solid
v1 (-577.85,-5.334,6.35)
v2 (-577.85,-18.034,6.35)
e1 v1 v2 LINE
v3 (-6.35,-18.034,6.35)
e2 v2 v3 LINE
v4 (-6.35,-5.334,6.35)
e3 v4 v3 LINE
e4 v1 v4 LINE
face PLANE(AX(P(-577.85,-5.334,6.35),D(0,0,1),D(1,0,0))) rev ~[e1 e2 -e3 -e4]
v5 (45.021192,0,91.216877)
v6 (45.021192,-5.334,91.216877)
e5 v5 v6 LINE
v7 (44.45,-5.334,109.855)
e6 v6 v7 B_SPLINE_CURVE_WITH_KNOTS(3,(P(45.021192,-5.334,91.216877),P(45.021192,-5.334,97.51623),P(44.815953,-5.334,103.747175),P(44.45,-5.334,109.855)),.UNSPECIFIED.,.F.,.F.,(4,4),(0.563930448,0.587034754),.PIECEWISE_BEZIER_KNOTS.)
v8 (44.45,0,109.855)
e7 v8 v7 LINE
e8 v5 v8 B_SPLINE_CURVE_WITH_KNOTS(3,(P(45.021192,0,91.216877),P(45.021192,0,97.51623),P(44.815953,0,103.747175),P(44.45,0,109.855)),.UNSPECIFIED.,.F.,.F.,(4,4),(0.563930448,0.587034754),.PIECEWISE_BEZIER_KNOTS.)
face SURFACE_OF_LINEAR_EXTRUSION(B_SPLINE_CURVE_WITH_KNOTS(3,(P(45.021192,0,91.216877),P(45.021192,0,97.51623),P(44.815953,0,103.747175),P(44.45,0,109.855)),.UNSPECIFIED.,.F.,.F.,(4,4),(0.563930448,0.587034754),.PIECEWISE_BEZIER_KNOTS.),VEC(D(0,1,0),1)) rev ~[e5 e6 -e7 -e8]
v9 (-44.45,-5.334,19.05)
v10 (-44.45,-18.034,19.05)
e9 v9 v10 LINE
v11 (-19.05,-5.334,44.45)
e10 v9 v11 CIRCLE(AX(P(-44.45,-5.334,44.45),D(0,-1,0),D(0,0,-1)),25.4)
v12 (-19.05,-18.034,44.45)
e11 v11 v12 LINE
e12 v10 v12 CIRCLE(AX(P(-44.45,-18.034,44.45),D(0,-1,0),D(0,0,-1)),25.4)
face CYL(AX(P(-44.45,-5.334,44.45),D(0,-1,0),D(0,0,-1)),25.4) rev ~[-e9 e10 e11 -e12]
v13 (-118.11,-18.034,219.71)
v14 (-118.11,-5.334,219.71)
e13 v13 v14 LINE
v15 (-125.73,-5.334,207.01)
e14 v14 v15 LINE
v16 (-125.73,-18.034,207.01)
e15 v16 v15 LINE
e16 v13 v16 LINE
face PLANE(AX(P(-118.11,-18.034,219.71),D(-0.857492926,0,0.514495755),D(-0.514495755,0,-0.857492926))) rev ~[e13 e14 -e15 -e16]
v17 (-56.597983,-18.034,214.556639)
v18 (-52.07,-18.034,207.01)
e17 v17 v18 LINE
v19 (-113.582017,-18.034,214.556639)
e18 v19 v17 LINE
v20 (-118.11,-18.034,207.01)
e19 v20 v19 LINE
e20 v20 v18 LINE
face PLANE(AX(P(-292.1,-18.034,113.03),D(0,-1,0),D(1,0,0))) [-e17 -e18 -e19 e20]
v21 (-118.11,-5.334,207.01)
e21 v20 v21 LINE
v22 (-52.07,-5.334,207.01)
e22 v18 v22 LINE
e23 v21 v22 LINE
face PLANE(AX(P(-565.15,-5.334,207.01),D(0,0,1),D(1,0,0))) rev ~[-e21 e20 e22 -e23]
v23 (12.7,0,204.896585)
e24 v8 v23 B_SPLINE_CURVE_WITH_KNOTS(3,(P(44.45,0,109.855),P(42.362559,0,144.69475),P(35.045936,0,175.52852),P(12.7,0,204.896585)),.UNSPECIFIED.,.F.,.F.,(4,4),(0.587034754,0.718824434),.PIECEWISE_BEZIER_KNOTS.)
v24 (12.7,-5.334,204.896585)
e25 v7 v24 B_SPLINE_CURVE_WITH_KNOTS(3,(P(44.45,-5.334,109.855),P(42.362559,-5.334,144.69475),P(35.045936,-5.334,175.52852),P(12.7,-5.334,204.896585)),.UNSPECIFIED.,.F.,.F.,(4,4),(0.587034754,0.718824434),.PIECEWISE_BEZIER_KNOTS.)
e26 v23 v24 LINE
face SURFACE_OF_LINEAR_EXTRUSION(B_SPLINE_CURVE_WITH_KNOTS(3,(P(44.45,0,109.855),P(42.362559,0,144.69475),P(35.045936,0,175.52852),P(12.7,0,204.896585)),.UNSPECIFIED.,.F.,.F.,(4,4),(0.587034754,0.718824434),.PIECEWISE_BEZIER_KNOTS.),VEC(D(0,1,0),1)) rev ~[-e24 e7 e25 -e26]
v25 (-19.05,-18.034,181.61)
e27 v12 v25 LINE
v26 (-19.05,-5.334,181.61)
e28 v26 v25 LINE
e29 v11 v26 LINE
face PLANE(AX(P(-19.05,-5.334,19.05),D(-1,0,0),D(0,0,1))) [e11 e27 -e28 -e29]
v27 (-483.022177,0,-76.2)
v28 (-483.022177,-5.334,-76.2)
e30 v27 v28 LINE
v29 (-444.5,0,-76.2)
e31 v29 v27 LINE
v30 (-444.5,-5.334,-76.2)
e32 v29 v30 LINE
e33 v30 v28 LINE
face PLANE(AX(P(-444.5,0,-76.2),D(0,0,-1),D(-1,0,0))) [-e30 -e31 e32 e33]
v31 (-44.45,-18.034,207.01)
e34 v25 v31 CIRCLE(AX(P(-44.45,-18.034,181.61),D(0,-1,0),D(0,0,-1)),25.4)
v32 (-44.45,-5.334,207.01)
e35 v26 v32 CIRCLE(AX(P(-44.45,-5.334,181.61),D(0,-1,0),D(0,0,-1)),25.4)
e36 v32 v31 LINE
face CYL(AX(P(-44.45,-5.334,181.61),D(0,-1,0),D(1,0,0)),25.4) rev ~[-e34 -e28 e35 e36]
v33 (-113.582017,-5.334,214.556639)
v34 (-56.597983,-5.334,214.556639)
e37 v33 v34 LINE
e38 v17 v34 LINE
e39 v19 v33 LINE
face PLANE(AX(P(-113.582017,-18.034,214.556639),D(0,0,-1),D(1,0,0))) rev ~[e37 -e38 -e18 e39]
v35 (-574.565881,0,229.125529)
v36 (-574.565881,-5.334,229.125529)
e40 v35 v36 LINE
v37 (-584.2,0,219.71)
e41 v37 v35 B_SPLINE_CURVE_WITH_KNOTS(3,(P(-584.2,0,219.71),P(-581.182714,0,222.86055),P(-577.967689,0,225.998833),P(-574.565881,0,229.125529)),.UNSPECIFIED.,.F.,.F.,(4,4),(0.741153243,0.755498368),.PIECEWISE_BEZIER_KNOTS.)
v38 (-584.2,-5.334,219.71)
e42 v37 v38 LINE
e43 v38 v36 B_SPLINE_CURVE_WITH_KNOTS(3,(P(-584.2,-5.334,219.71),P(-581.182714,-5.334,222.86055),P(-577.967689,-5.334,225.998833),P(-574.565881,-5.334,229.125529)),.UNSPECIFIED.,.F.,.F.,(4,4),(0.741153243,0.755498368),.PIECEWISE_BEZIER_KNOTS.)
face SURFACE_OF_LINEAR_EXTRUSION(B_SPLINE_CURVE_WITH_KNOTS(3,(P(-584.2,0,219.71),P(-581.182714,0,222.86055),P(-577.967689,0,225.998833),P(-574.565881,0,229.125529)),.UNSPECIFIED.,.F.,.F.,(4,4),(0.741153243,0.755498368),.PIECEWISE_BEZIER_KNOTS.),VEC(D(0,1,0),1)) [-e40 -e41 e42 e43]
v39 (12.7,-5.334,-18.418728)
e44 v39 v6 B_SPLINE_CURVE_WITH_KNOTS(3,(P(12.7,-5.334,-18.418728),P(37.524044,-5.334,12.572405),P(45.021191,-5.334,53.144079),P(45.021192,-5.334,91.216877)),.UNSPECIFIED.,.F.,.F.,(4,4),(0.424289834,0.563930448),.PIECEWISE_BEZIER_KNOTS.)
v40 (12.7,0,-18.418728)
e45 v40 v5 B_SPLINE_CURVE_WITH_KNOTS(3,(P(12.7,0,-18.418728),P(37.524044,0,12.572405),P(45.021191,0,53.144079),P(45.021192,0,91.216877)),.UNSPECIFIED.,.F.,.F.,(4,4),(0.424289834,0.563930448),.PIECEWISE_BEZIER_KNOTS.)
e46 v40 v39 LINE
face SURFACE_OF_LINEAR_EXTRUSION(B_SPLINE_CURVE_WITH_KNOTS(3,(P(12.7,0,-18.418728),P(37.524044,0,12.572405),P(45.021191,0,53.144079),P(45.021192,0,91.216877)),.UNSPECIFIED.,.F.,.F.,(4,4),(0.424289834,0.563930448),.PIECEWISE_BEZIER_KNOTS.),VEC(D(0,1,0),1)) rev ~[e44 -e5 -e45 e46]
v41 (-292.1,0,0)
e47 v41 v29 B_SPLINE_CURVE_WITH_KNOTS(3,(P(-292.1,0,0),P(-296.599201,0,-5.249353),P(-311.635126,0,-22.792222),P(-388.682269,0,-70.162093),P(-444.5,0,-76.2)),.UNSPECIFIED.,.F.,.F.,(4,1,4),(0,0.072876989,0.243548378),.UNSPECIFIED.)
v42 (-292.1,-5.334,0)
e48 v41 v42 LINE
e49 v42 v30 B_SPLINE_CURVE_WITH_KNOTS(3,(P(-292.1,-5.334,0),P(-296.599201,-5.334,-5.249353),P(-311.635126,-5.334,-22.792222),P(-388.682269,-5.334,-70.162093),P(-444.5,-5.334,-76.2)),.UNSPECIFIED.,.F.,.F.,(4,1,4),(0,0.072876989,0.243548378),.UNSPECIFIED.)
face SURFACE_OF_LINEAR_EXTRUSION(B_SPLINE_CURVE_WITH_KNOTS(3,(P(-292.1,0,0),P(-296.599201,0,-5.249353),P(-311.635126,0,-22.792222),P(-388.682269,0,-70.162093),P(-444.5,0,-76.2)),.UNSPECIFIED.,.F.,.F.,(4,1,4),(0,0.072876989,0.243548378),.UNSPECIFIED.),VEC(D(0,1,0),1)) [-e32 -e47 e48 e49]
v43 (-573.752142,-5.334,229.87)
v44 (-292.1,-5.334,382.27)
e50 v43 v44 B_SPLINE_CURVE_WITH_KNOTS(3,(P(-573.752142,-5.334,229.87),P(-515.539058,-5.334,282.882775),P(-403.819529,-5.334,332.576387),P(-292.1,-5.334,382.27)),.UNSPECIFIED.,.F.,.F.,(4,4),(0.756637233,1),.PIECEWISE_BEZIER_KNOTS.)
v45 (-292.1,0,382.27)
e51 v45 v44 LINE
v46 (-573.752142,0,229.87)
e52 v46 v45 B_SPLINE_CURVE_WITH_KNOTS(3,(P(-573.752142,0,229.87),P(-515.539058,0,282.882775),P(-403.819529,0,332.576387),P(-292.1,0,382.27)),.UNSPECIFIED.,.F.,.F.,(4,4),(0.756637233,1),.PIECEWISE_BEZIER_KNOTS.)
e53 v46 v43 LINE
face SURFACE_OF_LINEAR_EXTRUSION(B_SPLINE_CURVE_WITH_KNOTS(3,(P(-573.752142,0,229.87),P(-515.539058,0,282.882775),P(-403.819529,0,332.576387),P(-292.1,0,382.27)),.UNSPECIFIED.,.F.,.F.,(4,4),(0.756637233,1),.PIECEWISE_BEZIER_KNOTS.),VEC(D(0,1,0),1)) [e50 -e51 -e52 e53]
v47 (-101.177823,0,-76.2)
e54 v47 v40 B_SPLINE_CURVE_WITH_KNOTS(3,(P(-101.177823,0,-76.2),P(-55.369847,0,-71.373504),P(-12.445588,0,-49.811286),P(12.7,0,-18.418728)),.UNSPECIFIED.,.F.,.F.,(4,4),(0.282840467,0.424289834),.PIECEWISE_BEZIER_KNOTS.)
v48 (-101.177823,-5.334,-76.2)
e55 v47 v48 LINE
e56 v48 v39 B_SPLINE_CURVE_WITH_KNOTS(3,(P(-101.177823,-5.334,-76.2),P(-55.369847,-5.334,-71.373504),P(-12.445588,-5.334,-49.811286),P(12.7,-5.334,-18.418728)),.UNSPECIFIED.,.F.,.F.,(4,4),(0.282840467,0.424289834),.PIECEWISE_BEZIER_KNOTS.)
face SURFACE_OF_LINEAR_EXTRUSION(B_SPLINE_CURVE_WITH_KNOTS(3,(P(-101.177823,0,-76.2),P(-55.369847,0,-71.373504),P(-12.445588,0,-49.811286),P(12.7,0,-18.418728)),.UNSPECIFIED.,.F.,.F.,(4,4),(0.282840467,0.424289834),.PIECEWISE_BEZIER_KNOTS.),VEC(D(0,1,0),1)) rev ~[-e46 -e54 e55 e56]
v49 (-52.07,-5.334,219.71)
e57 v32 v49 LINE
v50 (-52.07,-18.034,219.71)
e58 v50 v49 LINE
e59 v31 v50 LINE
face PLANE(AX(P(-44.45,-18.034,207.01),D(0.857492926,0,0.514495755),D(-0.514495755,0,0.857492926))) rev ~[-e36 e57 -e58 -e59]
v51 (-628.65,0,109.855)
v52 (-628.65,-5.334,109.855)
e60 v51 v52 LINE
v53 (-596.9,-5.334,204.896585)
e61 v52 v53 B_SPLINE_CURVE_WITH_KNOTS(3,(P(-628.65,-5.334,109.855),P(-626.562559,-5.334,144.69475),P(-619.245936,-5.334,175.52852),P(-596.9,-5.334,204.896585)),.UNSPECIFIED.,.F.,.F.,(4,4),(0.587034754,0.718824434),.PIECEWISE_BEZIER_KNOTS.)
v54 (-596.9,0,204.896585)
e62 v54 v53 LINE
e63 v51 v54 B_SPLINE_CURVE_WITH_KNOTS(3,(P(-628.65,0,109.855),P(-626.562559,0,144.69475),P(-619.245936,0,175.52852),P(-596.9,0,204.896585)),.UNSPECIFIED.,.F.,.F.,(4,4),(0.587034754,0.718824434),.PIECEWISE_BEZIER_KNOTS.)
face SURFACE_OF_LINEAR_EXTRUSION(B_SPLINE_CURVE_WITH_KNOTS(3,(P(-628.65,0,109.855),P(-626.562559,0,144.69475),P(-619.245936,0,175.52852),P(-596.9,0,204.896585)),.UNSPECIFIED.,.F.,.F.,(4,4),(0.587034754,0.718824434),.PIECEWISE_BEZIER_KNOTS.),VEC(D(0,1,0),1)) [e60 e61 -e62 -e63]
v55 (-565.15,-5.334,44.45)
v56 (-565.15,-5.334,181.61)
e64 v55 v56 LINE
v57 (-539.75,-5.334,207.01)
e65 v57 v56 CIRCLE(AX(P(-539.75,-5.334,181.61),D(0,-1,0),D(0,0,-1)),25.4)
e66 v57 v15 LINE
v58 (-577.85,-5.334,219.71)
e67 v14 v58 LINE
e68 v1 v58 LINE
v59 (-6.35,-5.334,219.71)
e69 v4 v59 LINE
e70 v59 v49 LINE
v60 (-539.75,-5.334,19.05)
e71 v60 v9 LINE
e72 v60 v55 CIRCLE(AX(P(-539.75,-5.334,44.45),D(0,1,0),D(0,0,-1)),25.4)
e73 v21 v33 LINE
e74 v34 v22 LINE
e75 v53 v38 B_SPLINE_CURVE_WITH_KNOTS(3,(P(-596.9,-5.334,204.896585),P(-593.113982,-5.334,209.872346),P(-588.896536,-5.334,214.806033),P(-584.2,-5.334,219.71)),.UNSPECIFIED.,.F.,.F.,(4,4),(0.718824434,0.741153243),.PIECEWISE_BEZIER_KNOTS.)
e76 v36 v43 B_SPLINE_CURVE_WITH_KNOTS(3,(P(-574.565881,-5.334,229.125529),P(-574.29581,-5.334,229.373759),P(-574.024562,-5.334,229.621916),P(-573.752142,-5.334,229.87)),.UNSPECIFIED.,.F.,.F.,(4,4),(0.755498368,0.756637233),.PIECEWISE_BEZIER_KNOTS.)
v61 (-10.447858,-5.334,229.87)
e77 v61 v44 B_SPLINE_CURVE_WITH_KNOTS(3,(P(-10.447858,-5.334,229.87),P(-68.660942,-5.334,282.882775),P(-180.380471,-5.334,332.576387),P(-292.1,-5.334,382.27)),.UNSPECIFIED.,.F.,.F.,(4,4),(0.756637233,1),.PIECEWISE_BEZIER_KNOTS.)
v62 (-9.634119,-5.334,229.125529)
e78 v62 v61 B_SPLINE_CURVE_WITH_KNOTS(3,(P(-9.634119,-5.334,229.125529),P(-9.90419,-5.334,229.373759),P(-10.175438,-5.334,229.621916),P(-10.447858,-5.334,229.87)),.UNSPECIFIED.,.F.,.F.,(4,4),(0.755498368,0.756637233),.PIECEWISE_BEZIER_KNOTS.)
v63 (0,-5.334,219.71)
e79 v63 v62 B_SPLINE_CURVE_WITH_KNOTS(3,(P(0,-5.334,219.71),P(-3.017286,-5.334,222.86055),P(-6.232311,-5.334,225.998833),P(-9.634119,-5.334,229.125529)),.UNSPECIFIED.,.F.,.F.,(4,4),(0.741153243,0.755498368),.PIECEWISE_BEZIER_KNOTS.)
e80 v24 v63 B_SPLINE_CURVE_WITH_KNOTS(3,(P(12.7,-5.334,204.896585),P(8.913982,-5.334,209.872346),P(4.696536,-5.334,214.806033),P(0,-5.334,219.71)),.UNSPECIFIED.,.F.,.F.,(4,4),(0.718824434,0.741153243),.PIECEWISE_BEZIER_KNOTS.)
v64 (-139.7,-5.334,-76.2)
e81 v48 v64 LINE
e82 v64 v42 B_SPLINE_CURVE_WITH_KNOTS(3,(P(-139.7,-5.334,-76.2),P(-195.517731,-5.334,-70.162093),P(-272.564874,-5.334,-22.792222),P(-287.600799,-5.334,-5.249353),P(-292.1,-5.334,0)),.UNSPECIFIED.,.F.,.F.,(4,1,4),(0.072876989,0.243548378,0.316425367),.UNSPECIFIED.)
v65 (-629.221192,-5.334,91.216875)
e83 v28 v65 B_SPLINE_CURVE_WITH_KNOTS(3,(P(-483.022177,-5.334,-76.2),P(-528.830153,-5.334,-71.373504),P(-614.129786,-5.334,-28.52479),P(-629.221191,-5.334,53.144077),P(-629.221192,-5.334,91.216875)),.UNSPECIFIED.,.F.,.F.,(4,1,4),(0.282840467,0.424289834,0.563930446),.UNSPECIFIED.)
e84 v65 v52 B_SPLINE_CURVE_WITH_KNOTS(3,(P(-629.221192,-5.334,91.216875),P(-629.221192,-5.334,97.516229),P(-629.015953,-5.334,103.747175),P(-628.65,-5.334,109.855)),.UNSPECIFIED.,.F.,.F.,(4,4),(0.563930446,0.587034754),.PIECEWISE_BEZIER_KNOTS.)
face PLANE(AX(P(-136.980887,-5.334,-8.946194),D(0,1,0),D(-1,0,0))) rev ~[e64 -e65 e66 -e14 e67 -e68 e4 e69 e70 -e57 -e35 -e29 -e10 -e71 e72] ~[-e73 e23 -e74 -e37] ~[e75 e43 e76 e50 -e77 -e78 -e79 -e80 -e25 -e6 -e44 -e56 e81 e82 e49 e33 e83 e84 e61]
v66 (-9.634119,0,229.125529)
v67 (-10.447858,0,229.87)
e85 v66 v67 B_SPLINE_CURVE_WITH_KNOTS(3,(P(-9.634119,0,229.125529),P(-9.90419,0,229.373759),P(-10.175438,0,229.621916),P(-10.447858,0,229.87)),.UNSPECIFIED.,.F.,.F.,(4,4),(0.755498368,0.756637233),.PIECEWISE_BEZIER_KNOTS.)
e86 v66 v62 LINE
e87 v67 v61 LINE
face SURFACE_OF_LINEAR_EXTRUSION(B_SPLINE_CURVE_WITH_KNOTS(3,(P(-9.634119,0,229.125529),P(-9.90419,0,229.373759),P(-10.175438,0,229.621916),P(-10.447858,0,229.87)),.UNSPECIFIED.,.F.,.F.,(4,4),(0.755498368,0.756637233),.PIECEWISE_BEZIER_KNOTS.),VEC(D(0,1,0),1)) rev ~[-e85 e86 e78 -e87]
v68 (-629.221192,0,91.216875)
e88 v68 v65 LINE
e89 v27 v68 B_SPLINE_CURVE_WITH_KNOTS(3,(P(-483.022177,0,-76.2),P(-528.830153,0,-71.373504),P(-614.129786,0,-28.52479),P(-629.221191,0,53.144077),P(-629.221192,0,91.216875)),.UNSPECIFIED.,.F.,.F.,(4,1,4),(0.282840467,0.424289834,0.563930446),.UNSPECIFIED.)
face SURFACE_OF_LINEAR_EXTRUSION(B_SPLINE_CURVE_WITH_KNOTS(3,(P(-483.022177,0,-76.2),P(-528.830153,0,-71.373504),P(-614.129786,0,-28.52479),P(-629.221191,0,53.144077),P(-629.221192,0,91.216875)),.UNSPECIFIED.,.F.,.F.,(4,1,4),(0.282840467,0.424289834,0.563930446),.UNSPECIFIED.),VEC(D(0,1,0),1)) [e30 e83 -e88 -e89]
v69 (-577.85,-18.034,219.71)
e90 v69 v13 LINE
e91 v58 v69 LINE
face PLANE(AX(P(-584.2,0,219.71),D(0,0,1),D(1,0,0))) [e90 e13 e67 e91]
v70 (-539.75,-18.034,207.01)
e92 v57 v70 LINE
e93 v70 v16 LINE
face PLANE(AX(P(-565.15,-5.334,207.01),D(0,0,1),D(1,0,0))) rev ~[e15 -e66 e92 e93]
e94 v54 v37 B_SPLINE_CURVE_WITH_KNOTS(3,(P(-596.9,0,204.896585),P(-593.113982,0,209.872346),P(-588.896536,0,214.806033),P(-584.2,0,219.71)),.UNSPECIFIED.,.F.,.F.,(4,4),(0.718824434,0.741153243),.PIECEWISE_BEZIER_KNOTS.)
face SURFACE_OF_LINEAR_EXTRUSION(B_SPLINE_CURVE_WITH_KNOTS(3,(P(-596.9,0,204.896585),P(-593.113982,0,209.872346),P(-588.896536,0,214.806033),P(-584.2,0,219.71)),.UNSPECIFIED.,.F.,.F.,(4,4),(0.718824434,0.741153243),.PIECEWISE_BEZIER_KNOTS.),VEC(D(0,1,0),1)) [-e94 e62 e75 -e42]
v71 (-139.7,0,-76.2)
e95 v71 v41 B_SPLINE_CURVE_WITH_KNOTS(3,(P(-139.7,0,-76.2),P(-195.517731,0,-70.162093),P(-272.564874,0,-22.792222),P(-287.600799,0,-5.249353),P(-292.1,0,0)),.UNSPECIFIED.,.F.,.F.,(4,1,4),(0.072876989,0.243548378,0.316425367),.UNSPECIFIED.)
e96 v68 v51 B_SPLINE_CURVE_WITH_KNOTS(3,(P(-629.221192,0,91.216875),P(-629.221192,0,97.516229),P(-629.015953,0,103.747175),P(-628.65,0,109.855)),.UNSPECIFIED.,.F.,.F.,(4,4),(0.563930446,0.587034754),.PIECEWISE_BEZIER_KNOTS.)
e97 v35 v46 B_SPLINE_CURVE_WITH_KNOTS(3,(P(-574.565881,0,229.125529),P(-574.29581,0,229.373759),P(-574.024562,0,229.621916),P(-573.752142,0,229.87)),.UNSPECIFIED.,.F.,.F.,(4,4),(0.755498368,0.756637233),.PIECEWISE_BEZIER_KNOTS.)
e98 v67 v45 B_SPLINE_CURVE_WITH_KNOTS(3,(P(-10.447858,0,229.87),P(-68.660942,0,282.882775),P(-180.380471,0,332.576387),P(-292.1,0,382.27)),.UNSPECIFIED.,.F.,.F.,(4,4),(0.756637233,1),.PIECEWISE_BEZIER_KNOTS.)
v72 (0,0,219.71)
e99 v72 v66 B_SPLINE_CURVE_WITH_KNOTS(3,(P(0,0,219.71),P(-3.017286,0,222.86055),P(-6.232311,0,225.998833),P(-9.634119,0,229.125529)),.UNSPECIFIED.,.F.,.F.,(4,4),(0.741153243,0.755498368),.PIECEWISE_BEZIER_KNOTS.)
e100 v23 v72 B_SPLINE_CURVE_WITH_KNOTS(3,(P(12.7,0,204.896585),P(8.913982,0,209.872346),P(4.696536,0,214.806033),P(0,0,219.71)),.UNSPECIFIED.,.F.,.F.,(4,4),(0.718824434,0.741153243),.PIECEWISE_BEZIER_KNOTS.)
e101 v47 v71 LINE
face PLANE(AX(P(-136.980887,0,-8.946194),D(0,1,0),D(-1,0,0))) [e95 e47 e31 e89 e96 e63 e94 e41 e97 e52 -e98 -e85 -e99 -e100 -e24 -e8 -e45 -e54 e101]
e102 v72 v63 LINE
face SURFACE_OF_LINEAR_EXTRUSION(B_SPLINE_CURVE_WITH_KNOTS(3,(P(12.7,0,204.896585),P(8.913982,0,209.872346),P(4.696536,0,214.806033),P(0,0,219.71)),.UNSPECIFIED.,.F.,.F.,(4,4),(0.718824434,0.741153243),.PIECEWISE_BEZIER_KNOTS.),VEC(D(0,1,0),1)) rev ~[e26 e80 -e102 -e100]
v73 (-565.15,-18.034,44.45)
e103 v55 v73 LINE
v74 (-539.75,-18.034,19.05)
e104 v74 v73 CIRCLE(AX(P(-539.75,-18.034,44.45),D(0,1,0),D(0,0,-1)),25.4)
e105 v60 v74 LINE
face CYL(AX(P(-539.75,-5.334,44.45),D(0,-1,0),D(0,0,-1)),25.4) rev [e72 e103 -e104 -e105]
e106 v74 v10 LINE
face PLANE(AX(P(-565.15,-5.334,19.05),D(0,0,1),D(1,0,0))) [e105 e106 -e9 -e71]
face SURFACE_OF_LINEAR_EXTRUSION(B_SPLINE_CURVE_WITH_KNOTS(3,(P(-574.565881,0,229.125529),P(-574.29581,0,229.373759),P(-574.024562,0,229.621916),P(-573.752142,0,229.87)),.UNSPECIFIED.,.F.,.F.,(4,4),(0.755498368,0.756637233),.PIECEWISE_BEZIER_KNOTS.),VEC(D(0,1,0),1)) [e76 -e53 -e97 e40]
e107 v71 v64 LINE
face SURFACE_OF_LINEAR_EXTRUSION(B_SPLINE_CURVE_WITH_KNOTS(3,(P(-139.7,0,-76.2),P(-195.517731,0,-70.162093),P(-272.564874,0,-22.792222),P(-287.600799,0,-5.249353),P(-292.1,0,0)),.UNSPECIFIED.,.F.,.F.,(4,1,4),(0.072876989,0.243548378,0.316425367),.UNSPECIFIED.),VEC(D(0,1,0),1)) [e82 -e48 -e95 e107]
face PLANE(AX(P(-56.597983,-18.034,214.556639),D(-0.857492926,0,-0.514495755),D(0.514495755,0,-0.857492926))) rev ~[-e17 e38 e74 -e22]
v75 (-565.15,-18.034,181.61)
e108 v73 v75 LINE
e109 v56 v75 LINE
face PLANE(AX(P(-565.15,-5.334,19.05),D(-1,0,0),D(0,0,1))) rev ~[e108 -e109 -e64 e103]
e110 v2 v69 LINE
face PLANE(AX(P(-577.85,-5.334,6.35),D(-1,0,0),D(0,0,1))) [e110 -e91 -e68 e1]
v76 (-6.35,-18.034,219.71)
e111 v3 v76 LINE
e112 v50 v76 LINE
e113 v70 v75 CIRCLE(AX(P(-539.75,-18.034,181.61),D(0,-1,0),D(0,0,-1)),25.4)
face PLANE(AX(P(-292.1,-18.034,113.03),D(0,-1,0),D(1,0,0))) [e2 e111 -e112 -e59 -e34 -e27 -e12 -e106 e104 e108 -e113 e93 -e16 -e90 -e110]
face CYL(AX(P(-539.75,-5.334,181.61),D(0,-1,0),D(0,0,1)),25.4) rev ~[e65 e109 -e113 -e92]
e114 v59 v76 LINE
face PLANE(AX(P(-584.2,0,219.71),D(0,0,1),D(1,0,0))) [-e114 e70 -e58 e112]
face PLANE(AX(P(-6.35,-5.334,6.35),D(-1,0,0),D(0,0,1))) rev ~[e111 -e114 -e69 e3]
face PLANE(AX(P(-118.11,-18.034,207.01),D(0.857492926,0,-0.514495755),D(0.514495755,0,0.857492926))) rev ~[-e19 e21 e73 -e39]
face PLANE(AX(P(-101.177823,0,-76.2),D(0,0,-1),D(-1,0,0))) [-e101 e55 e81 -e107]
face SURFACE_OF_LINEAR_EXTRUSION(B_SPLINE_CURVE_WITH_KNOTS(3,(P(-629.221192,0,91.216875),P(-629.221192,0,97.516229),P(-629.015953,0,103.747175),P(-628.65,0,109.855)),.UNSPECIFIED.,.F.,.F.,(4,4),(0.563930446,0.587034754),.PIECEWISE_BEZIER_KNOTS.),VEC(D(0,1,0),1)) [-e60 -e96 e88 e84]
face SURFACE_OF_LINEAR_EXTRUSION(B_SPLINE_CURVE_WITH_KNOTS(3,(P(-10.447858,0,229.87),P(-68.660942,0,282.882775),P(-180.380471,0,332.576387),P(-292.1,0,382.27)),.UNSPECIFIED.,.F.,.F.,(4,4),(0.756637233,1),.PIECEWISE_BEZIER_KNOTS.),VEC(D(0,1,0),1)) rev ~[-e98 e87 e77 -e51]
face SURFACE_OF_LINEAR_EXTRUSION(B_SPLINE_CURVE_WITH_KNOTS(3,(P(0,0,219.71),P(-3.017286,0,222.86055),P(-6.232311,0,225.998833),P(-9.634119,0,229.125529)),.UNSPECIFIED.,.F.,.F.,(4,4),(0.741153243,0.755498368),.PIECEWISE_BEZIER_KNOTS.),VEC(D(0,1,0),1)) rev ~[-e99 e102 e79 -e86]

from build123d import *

# Parameters (mm, degrees)
F0_W     = 584.2
F0_H     = 219.71
F1_DEPTH = 5.334
F2_W     = 571.5
F2_H     = 213.36
F2_W_2   = 546.1
F2_H_2   = 187.96
F3_DEPTH = 12.7
F4_R     = 25.4
F6_DEPTH = 12.7
F7_W     = 12.7
F7_H     = 109.855
F8_DEPTH = 5.334


# Not quite as in the source:
# - a feature names something its author has since deleted; it is built from what else it names


with BuildPart() as f1:
    # F0 (on Front) → F1 (new body)
    with BuildSketch(Plane.XZ):
        with Locations((-292.1, 109.855)):
            Rectangle(F0_W, F0_H)
    extrude(amount=F1_DEPTH)

    # F2 (on face) → F3 (join)
    with BuildSketch(Plane.XZ.offset(5.334)):
        with Locations((-292.1, 113.03)):
            Rectangle(F2_W, F2_H)
        with Locations((-292.1, 113.03)):
            Rectangle(F2_W_2, F2_H_2, mode=Mode.SUBTRACT)
    extrude(amount=F3_DEPTH)

    # F4
    f4_edges = [f1.edges().sort_by_distance(p)[0] for p in [
        (-565.15, -11.684, 207.01),
        (-19.05, -11.684, 207.01),
        (-19.05, -11.684, 19.05),
        (-565.15, -11.684, 19.05),
    ]]
    fillet(f4_edges, radius=F4_R)

    # F5 (on face) → F6 (cut)
    with BuildSketch(Plane.XZ.offset(18.034)):
        Polygon((-118.11, 219.71), (-125.73, 207.01), (-118.11, 207.01), (-113.5820166854, 214.5566388576), (-110.49, 219.71), align=None)
        Polygon((-56.5979833146, 214.5566388576), (-52.07, 207.01), (-44.45, 207.01), (-52.07, 219.71), (-59.69, 219.71), align=None)
        Polygon((-59.69, 219.71), (-110.49, 219.71), (-113.5820166854, 214.5566388576), (-56.5979833146, 214.5566388576), align=None)
    extrude(amount=-F6_DEPTH, mode=Mode.SUBTRACT)

    # F7 (on face) → F8 (join)
    with BuildSketch(Plane(origin=(0, 0, 0), x_dir=(-1, 0, 0), z_dir=(0, 1, 0))):
        with BuildLine():
            Line((292.1, 0), (0, 0))
            Line((0, 0), (-12.7, 0))
            Line((-12.7, 0), (-12.7, -18.4187279276))
            Line((-12.7, -18.4187279276), (273.05, -18.4187279276))
            add(Edge.make_bspline(
                [(292.1, 0), (287.6007994264, -5.2493532032), (283.1015988528, -10.4987064064), (273.05, -18.4187279276)],
                knots=[0, 0, 0, 0, 0.0728769887, 0.0728769887, 0.0728769887, 0.0728769887], degree=3))
        make_face()
        with Locations((-6.35, 54.9275)):
            Rectangle(F7_W, F7_H)
        with BuildLine():
            Line((-12.7, -18.4187279276), (-12.7, 0))
            Line((-12.7, 0), (-12.7, 109.855))
            Line((-12.7, 109.855), (-44.45, 109.855))
            add(Edge.make_bspline(
                [(-45.0211916342, 91.2168765815), (-45.0211916609, 97.5162300277), (-44.815953395, 103.7471754572), (-44.45, 109.855)],
                knots=[0.5639304479, 0.5639304479, 0.5639304479, 0.5639304479, 0.5870347541, 0.5870347541, 0.5870347541, 0.5870347541], degree=3))
            add(Edge.make_bspline(
                [(-12.7, -18.4187279276), (-37.5240442459, 12.5724048939), (-45.0211914731, 53.1440785365), (-45.0211916342, 91.2168765815)],
                knots=[0.4242898339, 0.4242898339, 0.4242898339, 0.4242898339, 0.5639304479, 0.5639304479, 0.5639304479, 0.5639304479], degree=3))
        make_face()
        with BuildLine():
            Line((584.2, 0), (292.1, 0))
            add(Edge.make_bspline(
                [(292.1, 0), (296.5992005736, -5.2493532032), (301.0984011472, -10.4987064064), (311.15, -18.4187279276)],
                knots=[0, 0, 0, 0, 0.0728769887, 0.0728769887, 0.0728769887, 0.0728769887], degree=3))
            Line((311.15, -18.4187279276), (596.9, -18.4187279276))
            Line((596.9, -18.4187279276), (596.9, 0))
            Line((596.9, 0), (584.2, 0))
        make_face()
        with BuildLine():
            Line((-12.7, 109.855), (0, 109.855))
            Line((0, 109.855), (0, 219.71))
            add(Edge.make_bspline(
                [(-12.7, 204.8965850641), (-8.9139816017, 209.8723459181), (-4.696536047, 214.8060326557), (0, 219.71)],
                knots=[0.7188244338, 0.7188244338, 0.7188244338, 0.7188244338, 0.7411532433, 0.7411532433, 0.7411532433, 0.7411532433], degree=3))
            Line((-12.7, 204.8965850641), (-12.7, 109.855))
        make_face()
        with BuildLine():
            Line((-44.45, 109.855), (-12.7, 109.855))
            Line((-12.7, 109.855), (-12.7, 204.8965850641))
            add(Edge.make_bspline(
                [(-44.45, 109.855), (-42.3625587956, 144.6947495266), (-35.0459362357, 175.5285199707), (-12.7, 204.8965850641)],
                knots=[0.5870347541, 0.5870347541, 0.5870347541, 0.5870347541, 0.7188244338, 0.7188244338, 0.7188244338, 0.7188244338], degree=3))
        make_face()
        with BuildLine():
            Line((273.05, -18.4187279276), (-12.7, -18.4187279276))
            add(Edge.make_bspline(
                [(101.1778231225, -76.2), (55.3698473988, -71.3735043498), (12.4455878923, -49.8112861475), (-12.7, -18.4187279276)],
                knots=[0.2828404673, 0.2828404673, 0.2828404673, 0.2828404673, 0.4242898339, 0.4242898339, 0.4242898339, 0.4242898339], degree=3))
            Line((101.1778231225, -76.2), (139.7, -76.2))
            add(Edge.make_bspline(
                [(273.05, -18.4187279276), (249.5100545477, -36.9667099273), (195.5177305995, -70.1620926298), (139.7, -76.2)],
                knots=[0.0728769887, 0.0728769887, 0.0728769887, 0.0728769887, 0.2435483779, 0.2435483779, 0.2435483779, 0.2435483779], degree=3))
        make_face()
        with BuildLine():
            Line((596.9, -18.4187279276), (311.15, -18.4187279276))
            add(Edge.make_bspline(
                [(311.15, -18.4187279276), (334.6899454523, -36.9667099273), (388.6822694005, -70.1620926298), (444.5, -76.2)],
                knots=[0.0728769887, 0.0728769887, 0.0728769887, 0.0728769887, 0.2435483779, 0.2435483779, 0.2435483779, 0.2435483779], degree=3))
            Line((444.5, -76.2), (483.0221768775, -76.2))
            add(Edge.make_bspline(
                [(483.0221768775, -76.2), (528.8301526012, -71.3735043498), (571.7544121077, -49.8112861475), (596.9, -18.4187279276)],
                knots=[0.2828404673, 0.2828404673, 0.2828404673, 0.2828404673, 0.4242898339, 0.4242898339, 0.4242898339, 0.4242898339], degree=3))
        make_face()
        with Locations((590.55, 54.9275)):
            Rectangle(F7_W, F7_H)
        with BuildLine():
            add(Edge.make_bspline(
                [(0, 219.71), (3.0172855437, 222.8605496023), (6.2323113272, 225.9988327955), (9.6341187106, 229.1255293763)],
                knots=[0.7411532433, 0.7411532433, 0.7411532433, 0.7411532433, 0.7554983677, 0.7554983677, 0.7554983677, 0.7554983677], degree=3))
            Line((0, 219.71), (292.1, 219.71))
            Line((292.1, 219.71), (9.6341187106, 229.1255293763))
        make_face()
        with BuildLine():
            Line((596.9, 0), (596.9, -18.4187279276))
            add(Edge.make_bspline(
                [(596.9, -18.4187279276), (621.7240438178, 12.5724043593), (629.2211912145, 53.144077137), (629.2211916342, 91.2168746116)],
                knots=[0.4242898339, 0.4242898339, 0.4242898339, 0.4242898339, 0.5639304455, 0.5639304455, 0.5639304455, 0.5639304455], degree=3))
            add(Edge.make_bspline(
                [(629.2211916342, 91.2168746116), (629.2211917037, 97.5162287286), (629.0159534331, 103.7471748205), (628.65, 109.855)],
                knots=[0.5639304455, 0.5639304455, 0.5639304455, 0.5639304455, 0.5870347541, 0.5870347541, 0.5870347541, 0.5870347541], degree=3))
            Line((628.65, 109.855), (596.9, 109.855))
            Line((596.9, 109.855), (596.9, 0))
        make_face()
        with BuildLine():
            Line((584.2, 219.71), (584.2, 109.855))
            Line((584.2, 109.855), (596.9, 109.855))
            Line((596.9, 109.855), (596.9, 204.8965850641))
            add(Edge.make_bspline(
                [(596.9, 204.8965850641), (593.1139816017, 209.8723459181), (588.896536047, 214.8060326557), (584.2, 219.71)],
                knots=[0.7188244338, 0.7188244338, 0.7188244338, 0.7188244338, 0.7411532433, 0.7411532433, 0.7411532433, 0.7411532433], degree=3))
        make_face()
        with BuildLine():
            add(Edge.make_bspline(
                [(9.6341187106, 229.1255293763), (9.9041896656, 229.3737591661), (10.1754378752, 229.6219159272), (10.4478578559, 229.87)],
                knots=[0.7554983677, 0.7554983677, 0.7554983677, 0.7554983677, 0.7566372333, 0.7566372333, 0.7566372333, 0.7566372333], degree=3))
            Line((9.6341187106, 229.1255293763), (292.1, 219.71))
            Line((292.1, 219.71), (574.5658812894, 229.1255293763))
            add(Edge.make_bspline(
                [(574.5658812894, 229.1255293763), (574.2958103344, 229.3737591661), (574.0245621248, 229.6219159272), (573.7521421441, 229.87)],
                knots=[0.7554983677, 0.7554983677, 0.7554983677, 0.7554983677, 0.7566372333, 0.7566372333, 0.7566372333, 0.7566372333], degree=3))
            Line((573.7521421441, 229.87), (514.35, 229.87))
            Line((514.35, 229.87), (292.1, 229.87))
            Line((292.1, 229.87), (69.85, 229.87))
            Line((69.85, 229.87), (10.4478578559, 229.87))
        make_face()
        with BuildLine():
            Line((574.5658812894, 229.1255293763), (292.1, 219.71))
            Line((292.1, 219.71), (584.2, 219.71))
            add(Edge.make_bspline(
                [(584.2, 219.71), (581.1827144563, 222.8605496023), (577.9676886728, 225.9988327955), (574.5658812894, 229.1255293763)],
                knots=[0.7411532433, 0.7411532433, 0.7411532433, 0.7411532433, 0.7554983677, 0.7554983677, 0.7554983677, 0.7554983677], degree=3))
        make_face()
        with BuildLine():
            Line((596.9, 204.8965850641), (596.9, 109.855))
            Line((596.9, 109.855), (628.65, 109.855))
            add(Edge.make_bspline(
                [(628.65, 109.855), (626.5625587956, 144.6947495266), (619.2459362357, 175.5285199707), (596.9, 204.8965850641)],
                knots=[0.5870347541, 0.5870347541, 0.5870347541, 0.5870347541, 0.7188244338, 0.7188244338, 0.7188244338, 0.7188244338], degree=3))
        make_face()
        with BuildLine():
            add(Edge.make_bspline(
                [(10.4478578559, 229.87), (68.6609423687, 282.8827748158), (180.3804711844, 332.5763874079), (292.1, 382.27)],
                knots=[0.7566372333, 0.7566372333, 0.7566372333, 0.7566372333, 1, 1, 1, 1], degree=3))
            Line((10.4478578559, 229.87), (69.85, 229.87))
            Line((69.85, 229.87), (292.1, 229.87))
            Line((292.1, 229.87), (292.1, 382.27))
        make_face()
        with BuildLine():
            add(Edge.make_bspline(
                [(573.7521421441, 229.87), (515.5390576313, 282.8827748158), (403.8195288156, 332.5763874079), (292.1, 382.27)],
                knots=[0.7566372333, 0.7566372333, 0.7566372333, 0.7566372333, 1, 1, 1, 1], degree=3))
            Line((292.1, 382.27), (292.1, 229.87))
            Line((292.1, 229.87), (514.35, 229.87))
            Line((514.35, 229.87), (573.7521421441, 229.87))
        make_face()
    extrude(amount=-F8_DEPTH)


solid = f1.part
